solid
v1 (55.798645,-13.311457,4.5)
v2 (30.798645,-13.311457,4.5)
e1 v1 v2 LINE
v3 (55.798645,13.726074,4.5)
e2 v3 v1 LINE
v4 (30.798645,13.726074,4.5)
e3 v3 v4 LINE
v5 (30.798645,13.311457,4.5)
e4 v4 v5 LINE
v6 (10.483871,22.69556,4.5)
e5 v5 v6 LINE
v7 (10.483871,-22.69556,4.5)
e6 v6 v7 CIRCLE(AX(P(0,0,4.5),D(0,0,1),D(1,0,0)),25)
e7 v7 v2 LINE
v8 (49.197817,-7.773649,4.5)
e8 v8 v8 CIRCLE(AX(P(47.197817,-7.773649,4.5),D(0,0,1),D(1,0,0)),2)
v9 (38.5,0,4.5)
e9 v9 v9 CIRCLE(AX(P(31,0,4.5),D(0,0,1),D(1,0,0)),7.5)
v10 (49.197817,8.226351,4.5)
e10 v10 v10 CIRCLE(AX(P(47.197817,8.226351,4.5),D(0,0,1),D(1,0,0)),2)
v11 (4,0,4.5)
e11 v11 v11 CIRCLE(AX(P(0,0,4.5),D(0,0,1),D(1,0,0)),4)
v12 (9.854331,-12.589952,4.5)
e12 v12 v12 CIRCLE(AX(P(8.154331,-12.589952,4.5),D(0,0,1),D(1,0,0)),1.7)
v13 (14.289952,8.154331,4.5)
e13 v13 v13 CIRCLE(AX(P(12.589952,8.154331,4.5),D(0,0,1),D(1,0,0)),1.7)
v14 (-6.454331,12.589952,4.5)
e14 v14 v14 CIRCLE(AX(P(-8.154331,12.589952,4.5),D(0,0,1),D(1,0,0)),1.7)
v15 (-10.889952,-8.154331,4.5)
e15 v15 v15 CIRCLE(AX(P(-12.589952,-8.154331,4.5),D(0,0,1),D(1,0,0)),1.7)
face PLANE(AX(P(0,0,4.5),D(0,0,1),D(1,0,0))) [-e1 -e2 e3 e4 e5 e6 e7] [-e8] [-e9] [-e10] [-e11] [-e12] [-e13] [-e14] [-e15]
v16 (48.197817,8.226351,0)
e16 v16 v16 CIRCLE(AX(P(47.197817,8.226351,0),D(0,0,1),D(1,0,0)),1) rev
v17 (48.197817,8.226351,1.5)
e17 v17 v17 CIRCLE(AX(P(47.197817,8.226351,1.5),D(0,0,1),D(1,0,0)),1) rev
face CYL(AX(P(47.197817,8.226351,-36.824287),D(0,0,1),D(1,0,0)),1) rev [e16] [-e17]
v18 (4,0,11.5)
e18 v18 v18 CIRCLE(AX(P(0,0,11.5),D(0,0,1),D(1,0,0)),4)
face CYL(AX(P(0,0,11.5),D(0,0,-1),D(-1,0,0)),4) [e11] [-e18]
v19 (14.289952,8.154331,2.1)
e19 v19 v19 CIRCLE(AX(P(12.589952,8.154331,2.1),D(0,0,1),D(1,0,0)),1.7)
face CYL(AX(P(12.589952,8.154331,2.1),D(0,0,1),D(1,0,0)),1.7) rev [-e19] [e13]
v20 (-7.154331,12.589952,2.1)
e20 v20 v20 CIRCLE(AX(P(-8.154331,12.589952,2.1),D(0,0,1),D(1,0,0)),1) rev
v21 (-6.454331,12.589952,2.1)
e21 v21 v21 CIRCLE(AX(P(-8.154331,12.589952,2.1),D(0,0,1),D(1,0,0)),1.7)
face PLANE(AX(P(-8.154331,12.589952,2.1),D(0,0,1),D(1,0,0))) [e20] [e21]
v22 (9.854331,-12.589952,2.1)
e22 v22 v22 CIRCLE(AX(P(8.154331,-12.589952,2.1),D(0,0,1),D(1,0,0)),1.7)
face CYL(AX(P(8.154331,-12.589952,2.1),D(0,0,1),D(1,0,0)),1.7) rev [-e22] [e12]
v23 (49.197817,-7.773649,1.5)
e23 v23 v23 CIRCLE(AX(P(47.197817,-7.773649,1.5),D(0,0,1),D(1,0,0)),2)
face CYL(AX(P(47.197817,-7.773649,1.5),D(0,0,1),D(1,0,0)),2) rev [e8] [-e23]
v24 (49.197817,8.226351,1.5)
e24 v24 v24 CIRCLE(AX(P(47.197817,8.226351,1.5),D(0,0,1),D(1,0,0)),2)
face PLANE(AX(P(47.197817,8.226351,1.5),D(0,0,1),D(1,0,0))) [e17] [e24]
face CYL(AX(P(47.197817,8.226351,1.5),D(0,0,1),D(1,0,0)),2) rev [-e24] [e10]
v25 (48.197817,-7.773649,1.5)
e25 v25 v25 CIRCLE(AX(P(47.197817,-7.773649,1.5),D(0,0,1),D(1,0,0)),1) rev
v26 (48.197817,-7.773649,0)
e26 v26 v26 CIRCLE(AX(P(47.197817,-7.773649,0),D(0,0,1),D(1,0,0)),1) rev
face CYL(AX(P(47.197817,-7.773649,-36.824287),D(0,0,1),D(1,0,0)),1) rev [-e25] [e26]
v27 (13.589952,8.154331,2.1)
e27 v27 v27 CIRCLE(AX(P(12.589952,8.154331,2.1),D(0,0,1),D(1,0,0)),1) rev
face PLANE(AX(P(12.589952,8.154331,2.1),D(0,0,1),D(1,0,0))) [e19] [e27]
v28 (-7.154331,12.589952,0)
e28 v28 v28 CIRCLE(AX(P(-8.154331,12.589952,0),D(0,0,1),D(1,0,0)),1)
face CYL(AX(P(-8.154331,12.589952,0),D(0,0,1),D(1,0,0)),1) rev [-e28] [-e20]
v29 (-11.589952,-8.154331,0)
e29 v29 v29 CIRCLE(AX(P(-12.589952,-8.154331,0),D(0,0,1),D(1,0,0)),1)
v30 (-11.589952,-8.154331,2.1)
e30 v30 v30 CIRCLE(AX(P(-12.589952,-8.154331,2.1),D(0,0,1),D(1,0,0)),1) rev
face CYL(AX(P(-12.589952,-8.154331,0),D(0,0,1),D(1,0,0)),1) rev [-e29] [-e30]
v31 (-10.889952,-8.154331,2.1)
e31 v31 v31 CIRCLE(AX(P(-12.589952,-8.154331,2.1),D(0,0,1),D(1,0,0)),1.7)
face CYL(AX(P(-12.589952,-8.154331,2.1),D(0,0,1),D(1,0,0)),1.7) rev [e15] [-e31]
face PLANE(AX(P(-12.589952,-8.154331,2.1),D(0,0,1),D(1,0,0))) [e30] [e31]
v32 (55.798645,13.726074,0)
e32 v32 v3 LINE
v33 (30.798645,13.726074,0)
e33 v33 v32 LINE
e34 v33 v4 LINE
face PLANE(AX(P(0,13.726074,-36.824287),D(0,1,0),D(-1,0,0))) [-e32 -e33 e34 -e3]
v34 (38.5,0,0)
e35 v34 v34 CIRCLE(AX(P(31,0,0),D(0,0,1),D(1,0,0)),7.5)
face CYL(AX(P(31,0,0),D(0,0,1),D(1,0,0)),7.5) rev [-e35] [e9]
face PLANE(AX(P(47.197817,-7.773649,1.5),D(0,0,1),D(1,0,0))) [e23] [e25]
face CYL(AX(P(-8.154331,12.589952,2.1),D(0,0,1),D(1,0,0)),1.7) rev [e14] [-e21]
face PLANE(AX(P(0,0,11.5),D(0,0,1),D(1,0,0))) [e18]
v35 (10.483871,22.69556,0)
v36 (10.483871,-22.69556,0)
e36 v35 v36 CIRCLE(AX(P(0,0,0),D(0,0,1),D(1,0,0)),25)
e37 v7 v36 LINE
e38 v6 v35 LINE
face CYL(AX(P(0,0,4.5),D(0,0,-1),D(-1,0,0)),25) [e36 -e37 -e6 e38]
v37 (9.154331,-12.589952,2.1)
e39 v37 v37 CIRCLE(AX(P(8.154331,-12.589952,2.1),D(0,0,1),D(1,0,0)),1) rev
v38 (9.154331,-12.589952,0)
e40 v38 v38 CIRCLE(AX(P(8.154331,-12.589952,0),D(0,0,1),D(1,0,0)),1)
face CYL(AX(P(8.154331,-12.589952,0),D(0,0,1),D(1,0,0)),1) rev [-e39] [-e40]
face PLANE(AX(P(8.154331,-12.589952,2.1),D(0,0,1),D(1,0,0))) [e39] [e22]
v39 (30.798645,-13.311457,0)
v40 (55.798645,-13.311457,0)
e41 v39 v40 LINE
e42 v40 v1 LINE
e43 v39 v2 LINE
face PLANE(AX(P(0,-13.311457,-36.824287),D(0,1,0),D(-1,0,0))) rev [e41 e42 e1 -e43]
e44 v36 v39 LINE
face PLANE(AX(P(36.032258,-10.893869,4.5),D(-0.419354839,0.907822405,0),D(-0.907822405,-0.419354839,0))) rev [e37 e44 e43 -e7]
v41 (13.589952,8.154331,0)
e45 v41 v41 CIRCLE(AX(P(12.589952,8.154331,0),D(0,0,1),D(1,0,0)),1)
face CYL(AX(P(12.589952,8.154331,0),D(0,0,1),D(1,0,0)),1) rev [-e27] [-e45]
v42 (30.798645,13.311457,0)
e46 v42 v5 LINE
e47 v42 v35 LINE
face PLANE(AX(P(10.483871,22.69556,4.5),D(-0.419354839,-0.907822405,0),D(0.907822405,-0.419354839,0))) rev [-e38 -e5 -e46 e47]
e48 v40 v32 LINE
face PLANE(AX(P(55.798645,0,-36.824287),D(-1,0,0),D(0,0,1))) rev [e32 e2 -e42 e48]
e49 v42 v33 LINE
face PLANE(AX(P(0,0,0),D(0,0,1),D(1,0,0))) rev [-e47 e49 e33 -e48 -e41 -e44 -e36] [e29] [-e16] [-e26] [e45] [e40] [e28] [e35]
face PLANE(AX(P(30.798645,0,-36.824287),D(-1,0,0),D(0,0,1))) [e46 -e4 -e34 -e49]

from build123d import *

# Parameters (mm, degrees)
BOSS_EXTRUDE1_DEPTH = 4.5
SKETCH2_R           = 7.5
CUT_EXTRUDE1_DEPTH  = 50.942466899
SKETCH3_R           = 4
BOSS_EXTRUDE2_DEPTH = 7
BOSS_EXTRUDE3_DEPTH = 4.5
FILLET1_R           = 10
CUT_EXTRUDE4_DEPTH  = 62.754464971
SKETCH9_R           = 1
CUT_EXTRUDE5_DEPTH  = 62.182594482
SKETCH10_R          = 1.7
CUT_EXTRUDE6_DEPTH  = 2.4
CUT_EXTRUDE7_DEPTH  = 4.5
FILLET2_R           = 10
CUT_EXTRUDE8_DEPTH  = 51.658168147
SKETCH20_R          = 1
BOSS_EXTRUDE4_DEPTH = 4.5
SKETCH21_R          = 2
CUT_EXTRUDE9_DEPTH  = 3


with BuildPart() as part:
    # Sketch1 → Boss-Extrude1 (new body)
    with BuildSketch(Plane.XY):
        with BuildLine():
            Line((10.483870968, 22.695560128), (36.032258065, 10.893868862))
            ThreePointArc((36.032258065, 10.893868862), (43, 0), (36.032258065, -10.893868862))
            Line((36.032258065, -10.893868862), (10.483870968, -22.695560128))
            ThreePointArc((10.483870968, -22.695560128), (-25, 0), (10.483870968, 22.695560128))
        make_face()
    extrude(amount=BOSS_EXTRUDE1_DEPTH)

    # Sketch2 → Cut-Extrude1 (cut, through all)
    with BuildSketch(Plane.XY.offset(4.5)):
        with Locations((31, 0)):
            Circle(SKETCH2_R)
    extrude(amount=-CUT_EXTRUDE1_DEPTH, mode=Mode.SUBTRACT)

    # Sketch3 → Boss-Extrude2 (add)
    with BuildSketch(Plane.XY.offset(4.5)):
        Circle(SKETCH3_R)
    extrude(amount=BOSS_EXTRUDE2_DEPTH)

    # Sketch4 → Boss-Extrude3 (add)
    with BuildSketch(Plane(origin=(0, 0, 0), x_dir=(-1, 0, 0), z_dir=(0, 0, -1))):
        with BuildLine():
            Line((-36.032258065, 10.893868862), (-56.032258065, 10.893868862))
            Line((-56.032258065, 10.893868862), (-56.032258065, -10.893868862))
            Line((-56.032258065, -10.893868862), (-36.032258065, -10.893868862))
            ThreePointArc((-36.032258065, -10.893868862), (-43, 0), (-36.032258065, 10.893868862))
        make_face()
        with BuildLine():
            Line((22.501635968, 10.893868862), (42.501635968, 10.893868862))
            Line((42.501635968, 10.893868862), (42.501635968, -10.893868862))
            Line((42.501635968, -10.893868862), (22.501635968, -10.893868862))
            ThreePointArc((22.501635968, -10.893868862), (25, 0), (22.501635968, 10.893868862))
        make_face()
    extrude(amount=-BOSS_EXTRUDE3_DEPTH)

    # Fillet1
    fillet1_edges = [part.edges().sort_by_distance(p)[0] for p in [
        (56.032258065, 10.893868862, 2.25),
        (56.032258065, -10.893868862, 2.25),
        (-42.501635968, -10.893868862, 2.25),
        (-42.501635968, 10.893868862, 2.25),
    ]]
    fillet(fillet1_edges, radius=FILLET1_R)

    # Sketch8 → Cut-Extrude4 (cut, through all)
    with BuildSketch(Plane.XY.offset(4.5)):
        with BuildLine():
            Line((56.032258065, 0.893868862), (56.032258065, -0.893868862))
            ThreePointArc((56.032258065, -0.893868862), (55.873267798, -2.669967796), (55.401352579, -4.389590243))
            Line((55.401352579, -4.389590243), (55.401352579, 4.389590243))
            ThreePointArc((55.401352579, 4.389590243), (55.873267798, 2.669967796), (56.032258065, 0.893868862))
        make_face()
        with BuildLine():
            Line((-42.501635968, -0.893868862), (-42.501635968, 0.893868862))
            ThreePointArc((-42.501635968, 0.893868862), (-42.342645701, 2.669967796), (-41.870730482, 4.389590243))
            Line((-41.870730482, 4.389590243), (-41.870730482, -4.389590243))
            ThreePointArc((-41.870730482, -4.389590243), (-42.342645701, -2.669967796), (-42.501635968, -0.893868862))
        make_face()
    extrude(amount=-CUT_EXTRUDE4_DEPTH, mode=Mode.SUBTRACT)

    # Sketch9 → Cut-Extrude5 (cut, through all)
    with BuildSketch(Plane.XY.offset(4.5)):
        with Locations((-8.154330676, 12.589951995)):
            Circle(SKETCH9_R)
        with Locations((12.589951995, 8.154330676)):
            Circle(SKETCH9_R)
        with Locations((8.154330676, -12.589951995)):
            Circle(SKETCH9_R)
        with Locations((-12.589951995, -8.154330676)):
            Circle(SKETCH9_R)
    extrude(amount=-CUT_EXTRUDE5_DEPTH, mode=Mode.SUBTRACT)

    # Sketch10 → Cut-Extrude6 (cut)
    with BuildSketch(Plane.XY.offset(4.5)):
        with Locations((-8.154330676, 12.589951995)):
            Circle(SKETCH10_R)
        with Locations((12.589951995, 8.154330676)):
            Circle(SKETCH10_R)
        with Locations((8.154330676, -12.589951995)):
            Circle(SKETCH10_R)
        with Locations((-12.589951995, -8.154330676)):
            Circle(SKETCH10_R)
    extrude(amount=-CUT_EXTRUDE6_DEPTH, mode=Mode.SUBTRACT)

    # Sketch11 → Cut-Extrude7 (cut)
    with BuildSketch(Plane(origin=(0, 0, 0), x_dir=(-1, 0, 0), z_dir=(0, 0, -1))):
        with BuildLine():
            Line((-40.960235838, 14.646128502), (-73.67178465, 18.9155259))
            Line((-73.67178465, 18.9155259), (-68.640309048, -15.675868866))
            Line((-68.640309048, -15.675868866), (-41.444996676, -13.212200821))
            ThreePointArc((-41.444996676, -13.212200821), (-43.493415761, 0.756825882), (-40.960235838, 14.646128502))
        make_face()
    extrude(amount=-CUT_EXTRUDE7_DEPTH, mode=Mode.SUBTRACT)

    # Fillet2
    # the kernel refuses this fillet: 10 mm, written as the material it takes off along each edge
    with BuildSketch(Plane(origin=(42.113817462, -10.893868862, 28.001897109), x_dir=(0.1443560651040101, 0.9895258088941827, 0), z_dir=(0, 0, -1))) as fillet2_piece_1:
        with BuildLine():
            CenterArc((8.32021185, -9.941449502), FILLET2_R, 83.796810377, 73.10182949)
            Line((-0.877909984, -6.017859982), (-1.061872421, -5.939388192))
            ThreePointArc((-1.061872421, -5.939388192), (-0.636860154, -2.980058778), (-0.197905162, 0.028871213))
            Line((-0.197905162, 0.028871213), (-0.02161094, 0.19882899))
            ThreePointArc((-0.02161094, 0.19882899), (4.700379422, 0.454694668), (9.422369784, 0.19882899))
            Line((9.422369784, 0.19882899), (9.400758844, 0))
        make_face()
    extrude(amount=51.503794219, mode=Mode.SUBTRACT)
    with BuildSketch(Plane(origin=(42.113817462, 10.893868862, 28.001897109), x_dir=(-1, 0, 0), z_dir=(0, 0, -1))) as fillet2_piece_2:
        with BuildLine():
            CenterArc((8.636247816, -9.668172893), FILLET2_R, 104.801368002, 73.10182949)
            Line((-1.357056556, -9.302293499), (-1.556922643, -9.294975911))
            ThreePointArc((-1.556922643, -9.294975911), (-1.128460387, -4.585508816), (-0.193626747, 0.050086753))
            Line((-0.193626747, 0.050086753), (0, 0.2))
            ThreePointArc((0, 0.2), (3.040779699, 0.2), (6.030465629, 0.193363458))
            Line((6.030465629, 0.193363458), (6.081559398, 0))
        make_face()
    extrude(amount=51.503794219, mode=Mode.SUBTRACT)

    # Sketch12 → Cut-Extrude8 (cut, through all)
    with BuildSketch(Plane.XY.offset(4.5)):
        with BuildLine():
            Line((-22.501635968, 10.893868862), (-42.592674389, 14.819498464))
            Line((-42.592674389, 14.819498464), (-48.148078041, -13.612584929))
            Line((-48.148078041, -13.612584929), (-27.427309778, -14.315310761))
            Line((-27.427309778, -14.315310761), (-22.501635968, -10.893868862))
            ThreePointArc((-22.501635968, -10.893868862), (-25, 0), (-22.501635968, 10.893868862))
        make_face()
    extrude(amount=-CUT_EXTRUDE8_DEPTH, mode=Mode.SUBTRACT)

    # Sketch20 → Boss-Extrude4 (add)
    with BuildSketch(Plane.XY.offset(4.5)):
        with BuildLine():
            Line((55.798644786, -13.311457412), (55.798644786, 13.726073795))
            Line((55.798644786, 13.726073795), (30.798644786, 13.726073795))
            Line((30.798644786, 13.726073795), (30.798644786, 13.311457412))
            Line((30.798644786, 13.311457412), (36.032258065, 10.893868862))
            ThreePointArc((36.032258065, 10.893868862), (41.287575846, 7.470998455), (43.470874018, 1.591575362))
            ThreePointArc((43.470874018, 1.591575362), (43.5, 0), (43.470874018, -1.591575362))
            ThreePointArc((43.470874018, -1.591575362), (41.287575846, -7.470998455), (36.032258065, -10.893868862))
            Line((36.032258065, -10.893868862), (30.798644786, -13.311457412))
            Line((30.798644786, -13.311457412), (55.798644786, -13.311457412))
        make_face()
        with Locations((47.197816856, -7.773648876)):
            Circle(SKETCH20_R, mode=Mode.SUBTRACT)
        with Locations((47.197816856, 8.226351124)):
            Circle(SKETCH20_R, mode=Mode.SUBTRACT)
    extrude(amount=-BOSS_EXTRUDE4_DEPTH)

    # Sketch21 → Cut-Extrude9 (cut)
    with BuildSketch(Plane.XY.offset(4.5)):
        with Locations((47.197816856, 8.226351124)):
            Circle(SKETCH21_R)
        with Locations((47.197816856, -7.773648876)):
            Circle(SKETCH21_R)
    extrude(amount=-CUT_EXTRUDE9_DEPTH, mode=Mode.SUBTRACT)


solid = part.part
